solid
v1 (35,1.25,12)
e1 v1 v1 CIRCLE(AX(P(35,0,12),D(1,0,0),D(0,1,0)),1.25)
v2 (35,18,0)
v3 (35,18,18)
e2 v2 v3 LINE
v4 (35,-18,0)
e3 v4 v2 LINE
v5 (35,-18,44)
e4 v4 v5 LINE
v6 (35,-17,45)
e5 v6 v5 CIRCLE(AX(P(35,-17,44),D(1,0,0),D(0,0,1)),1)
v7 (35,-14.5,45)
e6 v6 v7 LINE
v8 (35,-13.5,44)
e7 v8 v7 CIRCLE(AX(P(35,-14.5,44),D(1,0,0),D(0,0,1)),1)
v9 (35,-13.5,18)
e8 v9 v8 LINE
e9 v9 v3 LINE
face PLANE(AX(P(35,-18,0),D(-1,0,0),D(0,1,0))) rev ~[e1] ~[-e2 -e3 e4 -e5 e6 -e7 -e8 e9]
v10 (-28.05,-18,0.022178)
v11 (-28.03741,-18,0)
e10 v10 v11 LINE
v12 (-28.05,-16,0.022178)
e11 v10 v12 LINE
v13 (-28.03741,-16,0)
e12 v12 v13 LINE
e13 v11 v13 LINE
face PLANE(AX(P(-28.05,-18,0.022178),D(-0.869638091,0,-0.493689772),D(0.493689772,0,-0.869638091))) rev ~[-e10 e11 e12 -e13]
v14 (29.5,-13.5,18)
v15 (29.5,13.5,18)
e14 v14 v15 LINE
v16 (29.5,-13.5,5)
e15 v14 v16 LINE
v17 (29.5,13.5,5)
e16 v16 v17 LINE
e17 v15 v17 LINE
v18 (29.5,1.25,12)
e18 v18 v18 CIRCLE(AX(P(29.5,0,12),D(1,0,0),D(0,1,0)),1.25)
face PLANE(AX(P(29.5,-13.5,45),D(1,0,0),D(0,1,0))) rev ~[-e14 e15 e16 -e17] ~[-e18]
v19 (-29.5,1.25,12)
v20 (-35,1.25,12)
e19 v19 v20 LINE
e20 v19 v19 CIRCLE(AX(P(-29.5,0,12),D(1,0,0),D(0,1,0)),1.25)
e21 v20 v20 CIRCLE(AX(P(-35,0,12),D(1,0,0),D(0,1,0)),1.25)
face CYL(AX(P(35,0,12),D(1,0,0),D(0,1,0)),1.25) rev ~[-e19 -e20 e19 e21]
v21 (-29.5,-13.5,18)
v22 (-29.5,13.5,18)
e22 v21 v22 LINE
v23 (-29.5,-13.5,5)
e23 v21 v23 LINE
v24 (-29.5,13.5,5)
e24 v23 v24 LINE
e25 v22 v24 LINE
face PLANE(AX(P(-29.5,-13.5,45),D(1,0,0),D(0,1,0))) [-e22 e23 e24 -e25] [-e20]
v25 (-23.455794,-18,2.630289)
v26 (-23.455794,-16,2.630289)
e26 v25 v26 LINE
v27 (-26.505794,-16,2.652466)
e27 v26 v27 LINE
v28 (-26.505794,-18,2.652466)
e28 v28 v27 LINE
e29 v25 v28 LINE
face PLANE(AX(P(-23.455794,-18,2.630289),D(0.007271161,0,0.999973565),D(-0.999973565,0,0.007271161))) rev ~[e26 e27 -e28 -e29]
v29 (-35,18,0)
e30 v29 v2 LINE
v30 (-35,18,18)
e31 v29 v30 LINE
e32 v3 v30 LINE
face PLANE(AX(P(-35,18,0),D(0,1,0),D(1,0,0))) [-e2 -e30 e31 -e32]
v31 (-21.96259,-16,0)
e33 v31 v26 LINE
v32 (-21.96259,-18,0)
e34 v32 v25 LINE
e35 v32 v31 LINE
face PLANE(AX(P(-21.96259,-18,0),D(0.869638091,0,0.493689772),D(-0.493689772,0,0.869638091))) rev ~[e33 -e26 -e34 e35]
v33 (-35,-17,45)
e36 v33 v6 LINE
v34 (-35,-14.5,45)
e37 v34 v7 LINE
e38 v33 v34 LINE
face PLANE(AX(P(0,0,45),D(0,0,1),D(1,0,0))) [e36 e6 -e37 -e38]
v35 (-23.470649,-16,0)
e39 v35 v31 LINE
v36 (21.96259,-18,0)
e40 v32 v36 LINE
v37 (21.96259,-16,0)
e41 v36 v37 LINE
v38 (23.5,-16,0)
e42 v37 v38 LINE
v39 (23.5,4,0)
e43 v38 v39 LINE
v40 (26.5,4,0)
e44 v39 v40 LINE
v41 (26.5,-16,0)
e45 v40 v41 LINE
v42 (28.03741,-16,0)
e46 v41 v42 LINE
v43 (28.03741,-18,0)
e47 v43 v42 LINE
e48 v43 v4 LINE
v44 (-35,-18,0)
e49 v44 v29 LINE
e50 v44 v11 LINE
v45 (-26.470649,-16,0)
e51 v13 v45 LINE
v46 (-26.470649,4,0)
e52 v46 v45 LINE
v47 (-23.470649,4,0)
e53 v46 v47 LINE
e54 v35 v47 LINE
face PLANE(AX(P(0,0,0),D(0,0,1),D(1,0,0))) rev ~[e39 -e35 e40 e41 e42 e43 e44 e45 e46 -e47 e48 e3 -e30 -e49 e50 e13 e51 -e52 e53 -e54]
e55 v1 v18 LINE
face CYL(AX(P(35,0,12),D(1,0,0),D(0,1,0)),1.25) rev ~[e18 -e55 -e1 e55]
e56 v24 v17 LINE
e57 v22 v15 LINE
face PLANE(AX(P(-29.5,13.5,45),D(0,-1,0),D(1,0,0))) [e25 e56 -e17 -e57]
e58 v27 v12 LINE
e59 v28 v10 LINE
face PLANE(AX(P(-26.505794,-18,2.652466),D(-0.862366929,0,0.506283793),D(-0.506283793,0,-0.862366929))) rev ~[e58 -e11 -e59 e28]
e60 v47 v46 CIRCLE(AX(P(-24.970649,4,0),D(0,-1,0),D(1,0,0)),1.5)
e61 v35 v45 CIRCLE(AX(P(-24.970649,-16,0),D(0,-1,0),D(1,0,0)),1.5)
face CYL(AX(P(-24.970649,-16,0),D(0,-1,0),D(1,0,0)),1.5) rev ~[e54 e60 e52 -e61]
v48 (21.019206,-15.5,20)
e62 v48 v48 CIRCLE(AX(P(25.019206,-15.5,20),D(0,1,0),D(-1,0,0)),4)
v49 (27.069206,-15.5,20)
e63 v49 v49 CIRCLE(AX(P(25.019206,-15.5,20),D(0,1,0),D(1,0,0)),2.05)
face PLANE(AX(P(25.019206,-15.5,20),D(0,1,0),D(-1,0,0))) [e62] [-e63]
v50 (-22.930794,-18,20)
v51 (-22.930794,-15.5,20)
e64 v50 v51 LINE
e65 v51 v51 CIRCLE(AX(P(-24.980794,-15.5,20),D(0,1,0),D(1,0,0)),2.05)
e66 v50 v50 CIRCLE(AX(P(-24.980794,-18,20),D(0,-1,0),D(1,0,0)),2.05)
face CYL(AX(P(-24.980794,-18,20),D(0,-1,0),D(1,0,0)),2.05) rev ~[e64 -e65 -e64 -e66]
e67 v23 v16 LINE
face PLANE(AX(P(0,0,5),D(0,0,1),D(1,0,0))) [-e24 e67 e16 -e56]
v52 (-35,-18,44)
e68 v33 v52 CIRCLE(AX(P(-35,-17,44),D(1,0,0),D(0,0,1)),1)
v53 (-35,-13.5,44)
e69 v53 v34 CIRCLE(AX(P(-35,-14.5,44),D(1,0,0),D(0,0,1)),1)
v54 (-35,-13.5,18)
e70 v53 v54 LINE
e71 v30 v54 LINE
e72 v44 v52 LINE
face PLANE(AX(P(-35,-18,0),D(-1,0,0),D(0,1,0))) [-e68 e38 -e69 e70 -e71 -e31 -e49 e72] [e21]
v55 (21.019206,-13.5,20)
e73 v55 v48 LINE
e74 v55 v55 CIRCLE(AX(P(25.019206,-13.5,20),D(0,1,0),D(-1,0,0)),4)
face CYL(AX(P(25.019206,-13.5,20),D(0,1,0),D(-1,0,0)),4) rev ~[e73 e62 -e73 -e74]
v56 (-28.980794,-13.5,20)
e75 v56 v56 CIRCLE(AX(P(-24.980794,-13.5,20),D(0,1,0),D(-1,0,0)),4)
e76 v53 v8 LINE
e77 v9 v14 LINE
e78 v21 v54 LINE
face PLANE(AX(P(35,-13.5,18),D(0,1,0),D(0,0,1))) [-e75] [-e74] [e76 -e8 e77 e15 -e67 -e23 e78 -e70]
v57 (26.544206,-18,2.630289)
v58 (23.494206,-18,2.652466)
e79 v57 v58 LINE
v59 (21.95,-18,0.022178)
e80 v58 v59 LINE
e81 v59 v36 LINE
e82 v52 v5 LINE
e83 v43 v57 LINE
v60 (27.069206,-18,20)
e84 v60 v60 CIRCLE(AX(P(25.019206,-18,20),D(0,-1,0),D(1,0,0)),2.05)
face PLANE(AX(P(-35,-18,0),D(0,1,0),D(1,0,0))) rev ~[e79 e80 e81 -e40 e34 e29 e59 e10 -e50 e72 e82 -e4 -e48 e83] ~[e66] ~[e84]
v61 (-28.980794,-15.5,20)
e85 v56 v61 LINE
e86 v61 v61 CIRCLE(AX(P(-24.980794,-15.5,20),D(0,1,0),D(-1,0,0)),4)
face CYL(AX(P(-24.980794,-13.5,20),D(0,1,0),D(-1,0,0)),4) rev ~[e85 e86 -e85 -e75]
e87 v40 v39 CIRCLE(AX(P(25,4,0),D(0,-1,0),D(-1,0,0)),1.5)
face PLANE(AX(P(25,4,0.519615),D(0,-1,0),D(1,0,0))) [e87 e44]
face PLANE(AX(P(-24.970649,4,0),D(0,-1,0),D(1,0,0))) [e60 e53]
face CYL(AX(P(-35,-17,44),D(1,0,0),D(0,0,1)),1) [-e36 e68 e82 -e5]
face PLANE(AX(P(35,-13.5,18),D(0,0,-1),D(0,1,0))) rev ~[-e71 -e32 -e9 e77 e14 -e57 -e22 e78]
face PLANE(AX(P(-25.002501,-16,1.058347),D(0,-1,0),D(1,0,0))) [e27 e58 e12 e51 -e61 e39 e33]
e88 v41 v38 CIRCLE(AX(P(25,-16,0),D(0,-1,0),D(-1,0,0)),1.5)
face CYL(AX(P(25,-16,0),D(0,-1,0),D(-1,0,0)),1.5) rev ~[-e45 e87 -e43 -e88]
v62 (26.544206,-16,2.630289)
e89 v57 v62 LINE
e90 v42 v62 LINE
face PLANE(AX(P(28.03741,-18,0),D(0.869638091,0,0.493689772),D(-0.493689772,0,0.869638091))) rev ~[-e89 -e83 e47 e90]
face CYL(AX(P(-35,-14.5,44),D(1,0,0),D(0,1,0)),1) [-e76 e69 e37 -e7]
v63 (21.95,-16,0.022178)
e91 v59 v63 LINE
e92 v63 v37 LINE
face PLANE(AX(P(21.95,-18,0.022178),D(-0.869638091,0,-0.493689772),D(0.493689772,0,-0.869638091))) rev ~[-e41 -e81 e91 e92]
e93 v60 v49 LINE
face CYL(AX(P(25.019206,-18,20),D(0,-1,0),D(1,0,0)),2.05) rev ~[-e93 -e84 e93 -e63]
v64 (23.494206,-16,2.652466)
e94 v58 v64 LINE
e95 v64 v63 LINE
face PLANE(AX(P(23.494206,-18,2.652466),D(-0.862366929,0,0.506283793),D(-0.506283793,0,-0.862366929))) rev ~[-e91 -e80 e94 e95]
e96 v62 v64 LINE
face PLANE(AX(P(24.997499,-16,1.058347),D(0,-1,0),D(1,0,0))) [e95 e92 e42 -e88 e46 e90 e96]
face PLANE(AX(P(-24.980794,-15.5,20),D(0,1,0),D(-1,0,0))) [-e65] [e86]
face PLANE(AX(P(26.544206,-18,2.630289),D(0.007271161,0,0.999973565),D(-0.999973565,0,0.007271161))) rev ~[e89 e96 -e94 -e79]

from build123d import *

# Parameters (mm, degrees)
F0_W      = 70
F0_H      = 36
F1_DEPTH  = 45
F2_W      = 59
F2_H      = 27
F3_DEPTH  = 40
F4_W      = 31.5
F4_H      = 27
F4_W_2    = 0.0242067426
F5_DEPTH  = 70.001
F6_R      = 1.25
F7_DEPTH  = 70.001
F9_DEPTH  = 2
F10_R     = 1.5
F11_DEPTH = 20
F12_R     = 2.05
F13_DEPTH = 25.4
F14_R     = 4
F14_R_2   = 2.05
F15_DEPTH = 2
F16_R     = 1


with BuildPart() as f1:
    # F0 (on Top) → F1 (new body)
    with BuildSketch(Plane.XY):
        Rectangle(F0_W, F0_H)
    extrude(amount=F1_DEPTH)

    # F2 (on face) → F3 (cut)
    with BuildSketch(Plane.XY.offset(45)):
        Rectangle(F2_W, F2_H)
    extrude(amount=-F3_DEPTH, mode=Mode.SUBTRACT)

    # F4 (on face) → F5 (cut, through all)
    with BuildSketch(Plane.YZ.offset(35)):
        with Locations((2.25, 31.5)):
            Rectangle(F4_W, F4_H)
        with Locations((18.0121033713, 31.5)):
            Rectangle(F4_W_2, F4_H)
    extrude(amount=-F5_DEPTH, mode=Mode.SUBTRACT)

    # F6 (on face) → F7 (cut, through all)
    with BuildSketch(Plane.YZ.offset(35)):
        with Locations((0, 12)):
            Circle(F6_R)
    extrude(amount=-F7_DEPTH, mode=Mode.SUBTRACT)

    # F8 (on face) → F9 (cut)
    with BuildSketch(Plane.XZ.offset(18)):
        Polygon((-28.0374098564, 0), (-21.9625901436, 0), (-23.4557936101, 2.6302886672), (-26.5057936101, 2.6524662959), (-28.05, 0.0221776287), align=None)
        Polygon((21.95, 0.0221776287), (21.9625901436, 0), (28.0374098564, 0), (26.5442063899, 2.6302886672), (23.4942063899, 2.6524662959), align=None)
    extrude(amount=-F9_DEPTH, mode=Mode.SUBTRACT)

    # F10 (on face) → F11 (cut)
    with BuildSketch(Plane.XZ.offset(16)):
        with BuildLine():
            Line((23.5, 0), (26.5, 0))
            ThreePointArc((26.5, 0), (25, 1.5), (23.5, 0))
        make_face()
        with BuildLine():
            ThreePointArc((23.5, 0), (25, -1.5), (26.5, 0))
            Line((26.5, 0), (23.5, 0))
        make_face()
        with Locations((-24.9706488103, 0)):
            Circle(F10_R)
    extrude(amount=-F11_DEPTH, mode=Mode.SUBTRACT)

    # F12 (on face) → F13 (cut)
    with BuildSketch(Plane.XZ.offset(18)):
        with Locations((-24.9807936101, 20)):
            Circle(F12_R)
        with Locations((25.0192063899, 20)):
            Circle(F12_R)
    extrude(amount=-F13_DEPTH, mode=Mode.SUBTRACT)

    # F14 (on face) → F15 (cut)
    with BuildSketch(Plane(origin=(0, -13.5, 0), x_dir=(-1, 0, 0), z_dir=(0, 1, 0))):
        with Locations((24.9807936101, 20)):
            Circle(F14_R)
        with Locations((24.9807936101, 20)):
            Circle(F14_R_2, mode=Mode.SUBTRACT)
        with Locations((-25.0192063899, 20)):
            Circle(F14_R)
        with Locations((-25.0192063899, 20)):
            Circle(F14_R_2, mode=Mode.SUBTRACT)
    extrude(amount=-F15_DEPTH, mode=Mode.SUBTRACT)

    # F16
    f16_edges = [f1.edges().sort_by_distance(p)[0] for p in [
        (0, -13.5, 45),
        (0, -18, 45),
    ]]
    fillet(f16_edges, radius=F16_R)


solid = f1.part
